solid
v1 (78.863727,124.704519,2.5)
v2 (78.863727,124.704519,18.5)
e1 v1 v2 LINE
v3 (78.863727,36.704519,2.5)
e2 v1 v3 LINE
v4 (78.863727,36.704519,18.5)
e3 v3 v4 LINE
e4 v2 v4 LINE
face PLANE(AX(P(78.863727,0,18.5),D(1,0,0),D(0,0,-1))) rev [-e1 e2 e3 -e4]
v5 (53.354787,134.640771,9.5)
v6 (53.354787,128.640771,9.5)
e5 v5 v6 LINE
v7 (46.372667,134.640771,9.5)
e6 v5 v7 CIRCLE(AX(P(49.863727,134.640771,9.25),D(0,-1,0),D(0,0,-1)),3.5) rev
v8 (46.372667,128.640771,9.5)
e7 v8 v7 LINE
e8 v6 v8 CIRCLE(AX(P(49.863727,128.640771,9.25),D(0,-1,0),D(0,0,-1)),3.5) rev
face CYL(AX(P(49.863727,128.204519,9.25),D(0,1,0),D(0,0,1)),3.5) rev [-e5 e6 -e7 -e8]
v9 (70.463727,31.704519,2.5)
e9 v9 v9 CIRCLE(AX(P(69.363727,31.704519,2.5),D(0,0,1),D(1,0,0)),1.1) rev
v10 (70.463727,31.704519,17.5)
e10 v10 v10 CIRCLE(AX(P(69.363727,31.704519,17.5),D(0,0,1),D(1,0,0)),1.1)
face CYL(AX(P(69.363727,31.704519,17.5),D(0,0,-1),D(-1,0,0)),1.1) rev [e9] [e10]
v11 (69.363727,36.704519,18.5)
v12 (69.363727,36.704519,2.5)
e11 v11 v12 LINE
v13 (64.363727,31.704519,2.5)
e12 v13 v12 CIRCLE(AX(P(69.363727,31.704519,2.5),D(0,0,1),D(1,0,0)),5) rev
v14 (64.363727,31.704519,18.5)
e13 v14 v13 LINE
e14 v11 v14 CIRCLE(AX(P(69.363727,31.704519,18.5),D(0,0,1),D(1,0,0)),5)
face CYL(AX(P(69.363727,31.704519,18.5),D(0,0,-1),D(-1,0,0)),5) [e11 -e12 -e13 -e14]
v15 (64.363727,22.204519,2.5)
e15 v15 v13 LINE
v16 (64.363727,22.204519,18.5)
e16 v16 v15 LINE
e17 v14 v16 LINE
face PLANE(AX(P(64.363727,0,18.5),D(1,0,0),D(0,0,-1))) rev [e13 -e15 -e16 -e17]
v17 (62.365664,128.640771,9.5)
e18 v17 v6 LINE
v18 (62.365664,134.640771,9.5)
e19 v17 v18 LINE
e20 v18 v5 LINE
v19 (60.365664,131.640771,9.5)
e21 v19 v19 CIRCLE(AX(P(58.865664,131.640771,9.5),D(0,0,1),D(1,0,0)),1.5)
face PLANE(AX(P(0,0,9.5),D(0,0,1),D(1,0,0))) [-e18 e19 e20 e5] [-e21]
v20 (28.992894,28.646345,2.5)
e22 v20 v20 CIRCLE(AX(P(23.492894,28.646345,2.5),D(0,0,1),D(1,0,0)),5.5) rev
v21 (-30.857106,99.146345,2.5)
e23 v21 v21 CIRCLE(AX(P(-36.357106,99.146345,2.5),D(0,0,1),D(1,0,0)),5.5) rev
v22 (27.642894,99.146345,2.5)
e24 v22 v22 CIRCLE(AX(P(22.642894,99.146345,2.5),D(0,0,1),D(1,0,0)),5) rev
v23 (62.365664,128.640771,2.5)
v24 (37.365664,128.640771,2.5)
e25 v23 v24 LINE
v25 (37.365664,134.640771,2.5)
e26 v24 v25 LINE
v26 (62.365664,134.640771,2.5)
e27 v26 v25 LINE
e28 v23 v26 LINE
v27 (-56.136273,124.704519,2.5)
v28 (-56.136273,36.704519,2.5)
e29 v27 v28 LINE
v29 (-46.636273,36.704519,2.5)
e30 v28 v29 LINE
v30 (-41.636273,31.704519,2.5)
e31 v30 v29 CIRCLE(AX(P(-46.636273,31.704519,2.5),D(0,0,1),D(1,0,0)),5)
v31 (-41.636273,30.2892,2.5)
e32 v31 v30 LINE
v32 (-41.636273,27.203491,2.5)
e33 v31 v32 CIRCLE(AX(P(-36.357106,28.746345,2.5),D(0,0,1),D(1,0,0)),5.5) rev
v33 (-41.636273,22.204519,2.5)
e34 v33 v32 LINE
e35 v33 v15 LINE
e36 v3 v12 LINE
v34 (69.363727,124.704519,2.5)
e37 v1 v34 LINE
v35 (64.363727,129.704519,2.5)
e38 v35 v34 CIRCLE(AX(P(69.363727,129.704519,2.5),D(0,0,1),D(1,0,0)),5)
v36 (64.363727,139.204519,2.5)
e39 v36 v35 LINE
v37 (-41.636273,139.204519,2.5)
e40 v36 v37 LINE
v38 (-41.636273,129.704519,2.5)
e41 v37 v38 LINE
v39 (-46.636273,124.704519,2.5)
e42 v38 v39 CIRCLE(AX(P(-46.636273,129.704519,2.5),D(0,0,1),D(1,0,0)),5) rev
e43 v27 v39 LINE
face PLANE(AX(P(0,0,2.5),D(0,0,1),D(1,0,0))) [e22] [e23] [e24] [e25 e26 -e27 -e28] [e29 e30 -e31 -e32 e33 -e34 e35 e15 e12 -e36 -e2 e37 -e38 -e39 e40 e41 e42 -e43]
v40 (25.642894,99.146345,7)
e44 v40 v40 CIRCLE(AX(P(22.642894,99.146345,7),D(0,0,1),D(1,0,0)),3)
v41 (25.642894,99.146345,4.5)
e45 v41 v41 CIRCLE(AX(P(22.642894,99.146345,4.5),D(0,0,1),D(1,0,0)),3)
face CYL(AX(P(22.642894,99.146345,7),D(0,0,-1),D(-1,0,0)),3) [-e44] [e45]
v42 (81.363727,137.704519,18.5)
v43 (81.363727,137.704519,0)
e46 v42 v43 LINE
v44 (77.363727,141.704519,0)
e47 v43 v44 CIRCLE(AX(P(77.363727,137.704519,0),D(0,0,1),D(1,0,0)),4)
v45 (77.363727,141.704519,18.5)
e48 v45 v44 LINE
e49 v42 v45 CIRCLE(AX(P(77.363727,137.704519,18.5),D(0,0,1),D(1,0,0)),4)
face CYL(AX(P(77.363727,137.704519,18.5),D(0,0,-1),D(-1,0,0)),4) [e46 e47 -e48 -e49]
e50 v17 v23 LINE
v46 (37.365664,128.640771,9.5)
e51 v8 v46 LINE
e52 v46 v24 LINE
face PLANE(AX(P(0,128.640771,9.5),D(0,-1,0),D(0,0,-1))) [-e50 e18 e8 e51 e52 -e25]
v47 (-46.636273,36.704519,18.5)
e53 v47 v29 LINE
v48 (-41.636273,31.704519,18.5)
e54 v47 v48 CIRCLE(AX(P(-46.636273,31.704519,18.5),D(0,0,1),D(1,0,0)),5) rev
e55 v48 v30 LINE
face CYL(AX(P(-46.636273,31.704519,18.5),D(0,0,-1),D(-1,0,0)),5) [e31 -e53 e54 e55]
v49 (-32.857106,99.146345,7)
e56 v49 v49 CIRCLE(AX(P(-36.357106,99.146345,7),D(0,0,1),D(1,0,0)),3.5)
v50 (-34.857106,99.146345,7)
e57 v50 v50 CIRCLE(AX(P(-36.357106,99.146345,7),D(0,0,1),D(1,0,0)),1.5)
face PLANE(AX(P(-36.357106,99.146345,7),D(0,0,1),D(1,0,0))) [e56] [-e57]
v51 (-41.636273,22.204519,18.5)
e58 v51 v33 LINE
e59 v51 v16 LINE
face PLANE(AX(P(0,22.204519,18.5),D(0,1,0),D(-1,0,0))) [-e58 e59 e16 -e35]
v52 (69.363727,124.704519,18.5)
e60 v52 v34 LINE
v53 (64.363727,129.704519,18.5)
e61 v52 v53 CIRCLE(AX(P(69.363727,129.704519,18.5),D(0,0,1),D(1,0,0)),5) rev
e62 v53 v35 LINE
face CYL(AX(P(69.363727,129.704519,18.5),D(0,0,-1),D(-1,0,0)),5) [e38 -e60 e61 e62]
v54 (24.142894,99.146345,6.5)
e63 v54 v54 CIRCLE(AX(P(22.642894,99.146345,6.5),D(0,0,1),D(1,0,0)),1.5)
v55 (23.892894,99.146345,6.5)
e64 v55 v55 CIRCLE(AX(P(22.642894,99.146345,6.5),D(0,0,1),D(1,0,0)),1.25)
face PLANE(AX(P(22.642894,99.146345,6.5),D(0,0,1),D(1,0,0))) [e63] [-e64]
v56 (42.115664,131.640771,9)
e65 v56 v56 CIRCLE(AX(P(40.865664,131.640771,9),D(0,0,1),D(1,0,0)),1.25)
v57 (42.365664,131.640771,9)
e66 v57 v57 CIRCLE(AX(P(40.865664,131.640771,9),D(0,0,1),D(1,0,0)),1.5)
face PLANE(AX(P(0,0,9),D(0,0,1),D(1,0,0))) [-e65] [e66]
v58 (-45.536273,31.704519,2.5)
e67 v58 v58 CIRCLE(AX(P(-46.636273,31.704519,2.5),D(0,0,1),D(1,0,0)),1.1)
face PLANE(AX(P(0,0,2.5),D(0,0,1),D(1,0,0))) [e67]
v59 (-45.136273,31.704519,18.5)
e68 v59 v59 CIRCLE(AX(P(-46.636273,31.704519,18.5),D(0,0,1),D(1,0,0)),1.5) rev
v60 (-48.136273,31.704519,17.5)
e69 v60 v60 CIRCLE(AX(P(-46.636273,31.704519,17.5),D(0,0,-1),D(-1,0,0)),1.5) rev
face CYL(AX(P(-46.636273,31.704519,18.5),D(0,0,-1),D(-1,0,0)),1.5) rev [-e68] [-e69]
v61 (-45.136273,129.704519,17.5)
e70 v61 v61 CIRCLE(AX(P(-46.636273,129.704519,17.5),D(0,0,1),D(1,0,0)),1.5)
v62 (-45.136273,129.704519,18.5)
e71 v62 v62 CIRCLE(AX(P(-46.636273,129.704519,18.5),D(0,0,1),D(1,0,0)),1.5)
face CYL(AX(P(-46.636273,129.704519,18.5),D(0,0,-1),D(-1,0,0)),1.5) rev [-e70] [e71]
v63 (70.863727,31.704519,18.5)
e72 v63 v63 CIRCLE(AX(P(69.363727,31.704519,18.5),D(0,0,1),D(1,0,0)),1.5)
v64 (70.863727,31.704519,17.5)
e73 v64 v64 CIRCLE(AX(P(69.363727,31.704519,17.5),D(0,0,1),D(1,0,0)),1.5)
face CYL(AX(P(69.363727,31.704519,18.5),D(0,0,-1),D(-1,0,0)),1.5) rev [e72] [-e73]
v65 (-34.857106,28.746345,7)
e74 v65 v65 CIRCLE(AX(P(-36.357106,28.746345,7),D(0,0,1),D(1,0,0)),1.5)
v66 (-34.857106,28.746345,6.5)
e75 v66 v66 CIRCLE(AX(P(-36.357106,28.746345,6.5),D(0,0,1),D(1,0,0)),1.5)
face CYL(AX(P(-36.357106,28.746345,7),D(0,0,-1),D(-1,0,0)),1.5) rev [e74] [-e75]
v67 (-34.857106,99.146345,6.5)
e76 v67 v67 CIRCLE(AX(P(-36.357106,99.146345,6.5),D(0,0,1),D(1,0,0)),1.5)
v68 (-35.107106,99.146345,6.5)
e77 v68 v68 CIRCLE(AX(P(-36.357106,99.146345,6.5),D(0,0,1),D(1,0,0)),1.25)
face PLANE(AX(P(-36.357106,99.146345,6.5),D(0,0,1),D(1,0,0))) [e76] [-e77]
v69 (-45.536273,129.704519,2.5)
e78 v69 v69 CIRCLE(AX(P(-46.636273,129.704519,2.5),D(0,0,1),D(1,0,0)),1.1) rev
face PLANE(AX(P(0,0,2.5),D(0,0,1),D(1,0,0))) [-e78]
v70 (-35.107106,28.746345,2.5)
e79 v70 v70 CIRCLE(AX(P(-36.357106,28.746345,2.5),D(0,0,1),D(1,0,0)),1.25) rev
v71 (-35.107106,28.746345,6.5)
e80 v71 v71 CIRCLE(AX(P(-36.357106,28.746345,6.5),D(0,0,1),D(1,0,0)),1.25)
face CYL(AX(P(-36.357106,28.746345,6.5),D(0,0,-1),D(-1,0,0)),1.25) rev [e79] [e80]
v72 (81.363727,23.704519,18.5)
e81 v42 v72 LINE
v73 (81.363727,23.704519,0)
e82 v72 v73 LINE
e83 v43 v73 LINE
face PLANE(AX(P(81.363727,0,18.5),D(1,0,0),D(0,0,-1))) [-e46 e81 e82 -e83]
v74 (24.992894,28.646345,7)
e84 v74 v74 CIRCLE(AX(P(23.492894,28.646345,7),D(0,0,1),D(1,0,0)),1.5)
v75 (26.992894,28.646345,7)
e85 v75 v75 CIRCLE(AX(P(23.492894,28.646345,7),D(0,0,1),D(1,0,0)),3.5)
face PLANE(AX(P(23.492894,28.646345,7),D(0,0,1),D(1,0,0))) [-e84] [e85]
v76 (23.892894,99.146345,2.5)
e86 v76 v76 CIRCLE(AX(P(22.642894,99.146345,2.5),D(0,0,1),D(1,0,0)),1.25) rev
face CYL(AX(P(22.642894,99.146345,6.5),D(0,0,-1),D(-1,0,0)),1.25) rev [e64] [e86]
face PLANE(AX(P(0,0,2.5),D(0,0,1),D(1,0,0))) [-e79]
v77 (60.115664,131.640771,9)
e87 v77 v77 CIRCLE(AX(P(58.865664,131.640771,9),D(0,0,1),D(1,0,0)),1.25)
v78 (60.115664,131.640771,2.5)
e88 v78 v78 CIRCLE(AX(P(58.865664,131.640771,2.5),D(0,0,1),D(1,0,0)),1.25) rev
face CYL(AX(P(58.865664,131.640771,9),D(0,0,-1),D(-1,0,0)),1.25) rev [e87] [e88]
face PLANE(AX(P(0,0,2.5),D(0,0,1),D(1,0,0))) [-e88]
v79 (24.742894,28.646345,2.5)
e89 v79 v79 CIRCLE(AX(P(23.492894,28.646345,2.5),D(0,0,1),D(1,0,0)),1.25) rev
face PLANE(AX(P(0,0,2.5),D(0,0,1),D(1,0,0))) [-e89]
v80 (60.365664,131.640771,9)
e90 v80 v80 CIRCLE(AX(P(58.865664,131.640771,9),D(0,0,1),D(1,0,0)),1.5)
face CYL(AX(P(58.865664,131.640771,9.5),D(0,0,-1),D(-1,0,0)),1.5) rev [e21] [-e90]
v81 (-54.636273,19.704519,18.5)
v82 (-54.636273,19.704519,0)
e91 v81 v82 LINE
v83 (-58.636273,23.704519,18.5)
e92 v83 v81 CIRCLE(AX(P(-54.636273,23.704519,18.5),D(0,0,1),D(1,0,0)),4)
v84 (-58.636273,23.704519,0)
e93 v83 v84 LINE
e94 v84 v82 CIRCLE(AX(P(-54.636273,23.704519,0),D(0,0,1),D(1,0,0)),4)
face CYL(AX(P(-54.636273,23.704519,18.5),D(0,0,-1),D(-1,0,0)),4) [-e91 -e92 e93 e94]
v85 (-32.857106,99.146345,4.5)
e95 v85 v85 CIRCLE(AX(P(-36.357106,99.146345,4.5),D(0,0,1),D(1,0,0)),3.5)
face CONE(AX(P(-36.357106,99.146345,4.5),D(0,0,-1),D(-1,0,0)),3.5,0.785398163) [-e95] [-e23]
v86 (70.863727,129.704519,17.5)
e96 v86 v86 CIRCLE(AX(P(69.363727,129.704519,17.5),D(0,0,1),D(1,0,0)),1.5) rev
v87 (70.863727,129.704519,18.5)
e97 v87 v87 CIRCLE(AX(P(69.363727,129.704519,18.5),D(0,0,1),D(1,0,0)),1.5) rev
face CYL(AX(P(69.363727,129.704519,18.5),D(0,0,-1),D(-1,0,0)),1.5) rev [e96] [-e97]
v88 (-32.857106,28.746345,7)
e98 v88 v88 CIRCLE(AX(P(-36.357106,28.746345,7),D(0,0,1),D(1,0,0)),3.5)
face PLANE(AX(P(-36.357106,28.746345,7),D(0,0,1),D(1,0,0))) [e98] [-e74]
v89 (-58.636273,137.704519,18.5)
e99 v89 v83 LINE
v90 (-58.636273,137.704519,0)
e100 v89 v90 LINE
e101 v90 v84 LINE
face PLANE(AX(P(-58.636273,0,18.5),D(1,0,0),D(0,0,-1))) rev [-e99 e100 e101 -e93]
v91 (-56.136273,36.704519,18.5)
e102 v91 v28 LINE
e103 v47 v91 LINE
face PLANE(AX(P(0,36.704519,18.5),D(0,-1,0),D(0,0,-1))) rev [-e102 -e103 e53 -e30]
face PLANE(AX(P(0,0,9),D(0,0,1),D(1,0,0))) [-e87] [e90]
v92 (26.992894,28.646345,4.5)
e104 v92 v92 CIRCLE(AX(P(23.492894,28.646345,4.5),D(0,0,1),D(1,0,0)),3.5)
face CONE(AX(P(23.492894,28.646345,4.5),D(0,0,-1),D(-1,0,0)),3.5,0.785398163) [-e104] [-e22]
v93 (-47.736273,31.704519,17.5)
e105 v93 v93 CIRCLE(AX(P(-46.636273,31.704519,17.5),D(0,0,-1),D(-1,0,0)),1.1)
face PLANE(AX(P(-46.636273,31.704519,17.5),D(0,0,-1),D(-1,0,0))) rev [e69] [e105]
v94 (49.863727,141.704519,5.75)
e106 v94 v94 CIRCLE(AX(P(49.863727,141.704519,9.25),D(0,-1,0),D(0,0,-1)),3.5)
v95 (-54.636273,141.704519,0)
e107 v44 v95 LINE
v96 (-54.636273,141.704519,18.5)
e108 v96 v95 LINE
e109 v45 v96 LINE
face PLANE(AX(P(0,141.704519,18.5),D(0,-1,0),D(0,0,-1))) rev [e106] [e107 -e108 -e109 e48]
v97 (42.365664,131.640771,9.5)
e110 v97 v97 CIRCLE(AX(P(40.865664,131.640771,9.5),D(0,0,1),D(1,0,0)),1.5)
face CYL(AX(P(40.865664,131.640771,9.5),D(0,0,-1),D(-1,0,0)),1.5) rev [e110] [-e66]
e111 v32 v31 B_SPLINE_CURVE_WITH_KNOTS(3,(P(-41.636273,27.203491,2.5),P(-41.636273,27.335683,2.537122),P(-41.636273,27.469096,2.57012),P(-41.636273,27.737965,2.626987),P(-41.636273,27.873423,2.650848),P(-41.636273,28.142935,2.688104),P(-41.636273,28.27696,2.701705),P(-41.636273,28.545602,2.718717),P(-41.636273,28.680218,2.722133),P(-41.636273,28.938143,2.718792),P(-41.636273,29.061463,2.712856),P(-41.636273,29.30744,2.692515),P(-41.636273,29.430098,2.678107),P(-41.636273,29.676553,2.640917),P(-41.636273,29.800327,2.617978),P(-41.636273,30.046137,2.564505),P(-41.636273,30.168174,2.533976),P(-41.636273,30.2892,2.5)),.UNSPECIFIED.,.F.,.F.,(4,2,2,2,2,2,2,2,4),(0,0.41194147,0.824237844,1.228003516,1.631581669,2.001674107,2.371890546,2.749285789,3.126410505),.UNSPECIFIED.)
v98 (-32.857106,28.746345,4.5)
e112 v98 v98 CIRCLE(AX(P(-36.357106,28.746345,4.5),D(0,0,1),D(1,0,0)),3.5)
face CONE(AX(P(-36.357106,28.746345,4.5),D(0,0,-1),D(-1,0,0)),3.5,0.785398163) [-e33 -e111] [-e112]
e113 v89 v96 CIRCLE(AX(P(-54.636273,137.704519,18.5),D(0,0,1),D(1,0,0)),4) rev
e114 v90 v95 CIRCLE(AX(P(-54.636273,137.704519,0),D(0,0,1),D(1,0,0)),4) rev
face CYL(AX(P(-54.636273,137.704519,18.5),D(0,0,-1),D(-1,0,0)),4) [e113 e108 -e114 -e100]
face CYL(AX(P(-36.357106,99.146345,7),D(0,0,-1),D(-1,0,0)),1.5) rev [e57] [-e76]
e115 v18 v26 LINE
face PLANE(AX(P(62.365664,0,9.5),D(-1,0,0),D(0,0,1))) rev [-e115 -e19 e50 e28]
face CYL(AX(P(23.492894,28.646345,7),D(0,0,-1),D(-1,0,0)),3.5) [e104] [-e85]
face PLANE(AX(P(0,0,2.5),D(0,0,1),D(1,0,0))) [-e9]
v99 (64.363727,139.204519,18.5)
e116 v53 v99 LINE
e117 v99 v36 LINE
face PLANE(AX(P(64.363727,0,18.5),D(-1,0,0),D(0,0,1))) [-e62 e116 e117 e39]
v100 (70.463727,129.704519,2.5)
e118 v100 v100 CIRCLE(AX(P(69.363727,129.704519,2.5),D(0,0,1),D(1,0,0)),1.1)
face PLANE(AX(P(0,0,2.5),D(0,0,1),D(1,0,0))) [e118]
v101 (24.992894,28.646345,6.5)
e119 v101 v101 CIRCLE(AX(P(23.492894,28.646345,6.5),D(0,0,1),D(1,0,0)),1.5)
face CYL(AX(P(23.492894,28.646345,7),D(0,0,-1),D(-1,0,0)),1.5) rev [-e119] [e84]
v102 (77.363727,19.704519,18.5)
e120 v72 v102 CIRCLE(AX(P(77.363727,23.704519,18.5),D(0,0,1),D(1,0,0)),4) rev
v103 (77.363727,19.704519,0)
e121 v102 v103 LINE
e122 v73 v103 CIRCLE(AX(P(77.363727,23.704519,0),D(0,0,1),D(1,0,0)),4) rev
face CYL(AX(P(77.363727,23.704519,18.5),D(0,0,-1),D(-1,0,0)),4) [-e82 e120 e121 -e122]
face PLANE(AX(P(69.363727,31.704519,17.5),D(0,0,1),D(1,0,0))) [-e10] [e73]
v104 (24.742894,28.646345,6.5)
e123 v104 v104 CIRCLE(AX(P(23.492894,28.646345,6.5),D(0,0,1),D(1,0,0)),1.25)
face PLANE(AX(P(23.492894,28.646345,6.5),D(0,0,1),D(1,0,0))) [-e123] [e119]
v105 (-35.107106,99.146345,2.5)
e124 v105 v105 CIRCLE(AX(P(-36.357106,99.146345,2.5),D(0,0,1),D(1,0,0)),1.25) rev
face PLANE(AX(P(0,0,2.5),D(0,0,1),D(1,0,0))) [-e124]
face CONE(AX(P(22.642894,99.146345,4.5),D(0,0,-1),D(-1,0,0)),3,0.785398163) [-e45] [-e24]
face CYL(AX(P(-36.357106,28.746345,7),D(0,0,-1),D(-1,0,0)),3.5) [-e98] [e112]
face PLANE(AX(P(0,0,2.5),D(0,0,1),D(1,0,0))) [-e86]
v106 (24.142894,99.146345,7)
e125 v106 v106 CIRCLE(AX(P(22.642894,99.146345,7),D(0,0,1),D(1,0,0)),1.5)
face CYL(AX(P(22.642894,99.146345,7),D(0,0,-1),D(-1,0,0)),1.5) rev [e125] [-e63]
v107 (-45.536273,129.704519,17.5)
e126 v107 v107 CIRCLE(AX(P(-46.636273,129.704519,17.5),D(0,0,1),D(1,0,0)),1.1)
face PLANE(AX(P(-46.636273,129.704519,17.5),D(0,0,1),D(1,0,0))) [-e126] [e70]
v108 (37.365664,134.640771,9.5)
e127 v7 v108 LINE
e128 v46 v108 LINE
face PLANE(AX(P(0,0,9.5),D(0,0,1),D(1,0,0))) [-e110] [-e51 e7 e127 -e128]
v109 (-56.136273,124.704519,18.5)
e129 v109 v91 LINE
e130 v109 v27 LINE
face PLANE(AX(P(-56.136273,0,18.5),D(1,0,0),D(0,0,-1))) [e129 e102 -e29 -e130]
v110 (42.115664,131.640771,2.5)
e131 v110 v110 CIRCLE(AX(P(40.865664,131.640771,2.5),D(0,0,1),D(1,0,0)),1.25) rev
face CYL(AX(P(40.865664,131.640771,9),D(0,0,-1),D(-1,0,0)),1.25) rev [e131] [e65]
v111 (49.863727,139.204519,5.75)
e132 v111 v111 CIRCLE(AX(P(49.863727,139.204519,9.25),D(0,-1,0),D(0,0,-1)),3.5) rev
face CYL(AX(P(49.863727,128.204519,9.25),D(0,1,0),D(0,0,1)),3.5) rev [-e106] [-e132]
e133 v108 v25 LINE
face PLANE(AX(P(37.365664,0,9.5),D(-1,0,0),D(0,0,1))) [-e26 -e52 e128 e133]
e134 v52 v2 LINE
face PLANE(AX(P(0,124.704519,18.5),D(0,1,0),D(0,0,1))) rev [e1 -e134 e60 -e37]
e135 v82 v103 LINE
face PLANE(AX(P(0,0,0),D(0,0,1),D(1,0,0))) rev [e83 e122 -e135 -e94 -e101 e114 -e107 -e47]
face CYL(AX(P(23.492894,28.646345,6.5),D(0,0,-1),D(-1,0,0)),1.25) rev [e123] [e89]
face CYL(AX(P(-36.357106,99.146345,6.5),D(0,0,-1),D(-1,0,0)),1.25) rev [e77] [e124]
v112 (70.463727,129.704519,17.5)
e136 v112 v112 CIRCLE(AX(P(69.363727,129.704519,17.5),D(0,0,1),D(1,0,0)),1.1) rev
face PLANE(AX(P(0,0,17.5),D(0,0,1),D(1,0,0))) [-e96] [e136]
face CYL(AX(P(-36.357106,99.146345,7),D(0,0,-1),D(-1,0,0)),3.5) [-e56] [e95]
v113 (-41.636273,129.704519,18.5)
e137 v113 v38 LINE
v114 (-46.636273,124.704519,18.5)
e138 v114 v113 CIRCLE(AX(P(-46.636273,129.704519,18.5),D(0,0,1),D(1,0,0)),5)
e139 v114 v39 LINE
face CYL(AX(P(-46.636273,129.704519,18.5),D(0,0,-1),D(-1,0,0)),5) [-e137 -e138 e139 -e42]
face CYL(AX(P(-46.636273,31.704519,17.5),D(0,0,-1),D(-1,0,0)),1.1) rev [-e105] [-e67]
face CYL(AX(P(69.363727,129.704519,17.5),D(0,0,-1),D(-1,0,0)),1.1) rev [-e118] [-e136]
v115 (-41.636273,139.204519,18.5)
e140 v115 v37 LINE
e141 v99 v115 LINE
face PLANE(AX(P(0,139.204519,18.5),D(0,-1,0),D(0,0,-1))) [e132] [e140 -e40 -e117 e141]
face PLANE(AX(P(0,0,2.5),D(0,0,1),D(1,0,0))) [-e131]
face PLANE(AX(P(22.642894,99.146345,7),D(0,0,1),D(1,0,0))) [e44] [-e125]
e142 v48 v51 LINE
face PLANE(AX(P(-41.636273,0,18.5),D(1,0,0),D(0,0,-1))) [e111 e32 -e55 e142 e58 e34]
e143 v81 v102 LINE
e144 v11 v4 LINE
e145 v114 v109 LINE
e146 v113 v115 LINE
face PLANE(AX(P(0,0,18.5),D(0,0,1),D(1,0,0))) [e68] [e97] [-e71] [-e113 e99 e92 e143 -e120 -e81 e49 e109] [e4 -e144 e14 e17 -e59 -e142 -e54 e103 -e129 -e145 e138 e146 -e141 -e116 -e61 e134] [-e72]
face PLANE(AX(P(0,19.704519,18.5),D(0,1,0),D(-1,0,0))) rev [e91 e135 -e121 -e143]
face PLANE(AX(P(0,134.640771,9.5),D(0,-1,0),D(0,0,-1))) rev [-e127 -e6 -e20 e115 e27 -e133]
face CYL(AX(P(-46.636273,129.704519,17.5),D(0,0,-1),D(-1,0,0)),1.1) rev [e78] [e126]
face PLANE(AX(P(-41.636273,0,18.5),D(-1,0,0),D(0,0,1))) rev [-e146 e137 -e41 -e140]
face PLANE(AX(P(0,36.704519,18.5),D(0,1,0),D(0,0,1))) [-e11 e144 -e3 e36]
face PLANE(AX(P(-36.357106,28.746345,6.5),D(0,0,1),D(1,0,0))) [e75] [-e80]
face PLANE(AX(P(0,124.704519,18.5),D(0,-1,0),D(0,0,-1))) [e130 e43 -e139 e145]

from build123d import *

# Parameters (mm, degrees)
CROQUIS1_W               = 25
CROQUIS1_H               = 6
CROQUIS1_R               = 3.5
CROQUIS1_R_2             = 3
CROQUIS1_R_3             = 1.5
CROQUIS1_R_4             = 1.25
CROQUIS1_R_5             = 1.1
SALIENTE_EXTRUIR5_DEPTH  = 18.5
VACIADO3_T               = -2.5
CROQUIS1_10_R            = 1.5
SALIENTE_EXTRUIR6_DEPTH  = 18.5
SALIENTE_EXTRUIR7_START  = 2.5
CROQUIS1_11_R            = 3.5
CROQUIS1_11_R_2          = 1.5
CROQUIS1_11_R_3          = 3
SALIENTE_EXTRUIR7_DEPTH  = 4.5
CHAFL_N1_SIZE            = 2
SALIENTE_EXTRUIR8_START  = 2.5
CROQUIS1_12_W            = 25
CROQUIS1_12_H            = 6
CROQUIS1_12_R            = 1.5
SALIENTE_EXTRUIR8_DEPTH  = 7
CROQUIS1_13_R            = 1.5
CROQUIS1_13_R_2          = 1.1
SALIENTE_EXTRUIR9_DEPTH  = 17.5
SALIENTE_EXTRUIR10_START = 2.5
CROQUIS1_14_R            = 1.5
CROQUIS1_14_R_2          = 1.25
SALIENTE_EXTRUIR10_DEPTH = 4
CORTAR_EXTRUIR2_START    = 141.704519
CORTAR_EXTRUIR2_DEPTH    = 13.5
CROQUIS1_17_R            = 1.5
CROQUIS1_17_R_2          = 1.25
SALIENTE_EXTRUIR12_DEPTH = 9


with BuildPart() as part:
    # Croquis1 → Saliente-Extruir5 (new body)
    # profile 1 of 32: a face of its own
    with BuildSketch(Plane.XY):
        with BuildLine():
            Line((-41.636272976, 141.704519051), (-41.636272976, 129.704519051))
            ThreePointArc((-41.636272976, 129.704519051), (-43.10073907, 126.168985145), (-46.636272976, 124.704519051))
            Line((-46.636272976, 124.704519051), (-58.636272976, 124.704519051))
            Line((-58.636272976, 124.704519051), (-58.636272976, 36.704519051))
            Line((-58.636272976, 36.704519051), (-46.636272976, 36.704519051))
            ThreePointArc((-46.636272976, 36.704519051), (-43.10073907, 35.240052957), (-41.636272976, 31.704519051))
            Line((-41.636272976, 31.704519051), (-41.636272976, 19.704519051))
            Line((-41.636272976, 19.704519051), (64.363727024, 19.704519051))
            Line((64.363727024, 19.704519051), (64.363727024, 31.704519051))
            ThreePointArc((64.363727024, 31.704519051), (65.828193118, 35.240052957), (69.363727024, 36.704519051))
            Line((69.363727024, 36.704519051), (81.363727024, 36.704519051))
            Line((81.363727024, 36.704519051), (81.363727024, 124.704519051))
            Line((81.363727024, 124.704519051), (69.363727024, 124.704519051))
            ThreePointArc((69.363727024, 124.704519051), (65.828193118, 126.168985145), (64.363727024, 129.704519051))
            Line((64.363727024, 129.704519051), (64.363727024, 141.704519051))
            Line((64.363727024, 141.704519051), (-41.636272976, 141.704519051))
        make_face()
        with BuildLine():
            Line((-40.35710629, 99.239677302), (-40.35710629, 102.746345322))
            Line((-40.35710629, 102.746345322), (-34.597202474, 102.746345322))
            Line((-34.597202474, 102.746345322), (21.034030845, 102.746345322))
            Line((21.034030845, 102.746345322), (26.64289371, 102.746345322))
            Line((26.64289371, 102.746345322), (26.64289371, 99.465838351))
            Line((26.64289371, 99.465838351), (26.64289371, 30.171959952))
            ThreePointArc((26.64289371, 30.171959952), (26.904271731, 29.428969114), (26.99289371, 28.646345322))
            ThreePointArc((26.99289371, 28.646345322), (26.904271731, 27.86372153), (26.64289371, 27.120730691))
            Line((26.64289371, 27.120730691), (26.64289371, 24.746345322))
            Line((26.64289371, 24.746345322), (20.74289371, 24.746345322))
            Line((20.74289371, 24.746345322), (-34.434462508, 24.746345322))
            Line((-34.434462508, 24.746345322), (-40.35710629, 24.746345322))
            Line((-40.35710629, 24.746345322), (-40.35710629, 28.581516019))
            Line((-40.35710629, 28.581516019), (-40.35710629, 99.239677302))
        make_face(mode=Mode.SUBTRACT)
        with Locations((49.86566447, 131.64077129)):
            Rectangle(CROQUIS1_W, CROQUIS1_H, mode=Mode.SUBTRACT)
    # profile 2 of 32: a face of its own
    with BuildSketch(Plane.XY):
        with BuildLine():
            Line((-34.597202474, 102.746345322), (-40.35710629, 102.746345322))
            Line((-40.35710629, 102.746345322), (-40.35710629, 99.239677302))
            Line((-40.35710629, 99.239677302), (-40.35710629, 28.581516019))
            Line((-40.35710629, 28.581516019), (-40.35710629, 24.746345322))
            Line((-40.35710629, 24.746345322), (-34.434462508, 24.746345322))
            Line((-34.434462508, 24.746345322), (20.74289371, 24.746345322))
            Line((20.74289371, 24.746345322), (26.64289371, 24.746345322))
            Line((26.64289371, 24.746345322), (26.64289371, 27.120730691))
            ThreePointArc((26.64289371, 27.120730691), (19.99289371, 28.646345322), (26.64289371, 30.171959952))
            Line((26.64289371, 30.171959952), (26.64289371, 99.465838351))
            Line((26.64289371, 99.465838351), (26.64289371, 102.746345322))
            Line((26.64289371, 102.746345322), (21.034030845, 102.746345322))
            Line((21.034030845, 102.746345322), (-34.597202474, 102.746345322))
        make_face()
        with Locations((-36.35710629, 28.746345322)):
            Circle(CROQUIS1_R, mode=Mode.SUBTRACT)
        with Locations((-36.35710629, 99.146345322)):
            Circle(CROQUIS1_R, mode=Mode.SUBTRACT)
        with Locations((22.64289371, 99.146345322)):
            Circle(CROQUIS1_R_2, mode=Mode.SUBTRACT)
    # profile 3 of 32: a face of its own
    with BuildSketch(Plane.XY):
        with Locations((-36.35710629, 99.146345322)):
            Circle(CROQUIS1_R)
        with Locations((-36.35710629, 99.146345322)):
            Circle(CROQUIS1_R_3, mode=Mode.SUBTRACT)
    # profile 4 of 32: a face of its own
    with BuildSketch(Plane.XY):
        with Locations((-36.35710629, 99.146345322)):
            Circle(CROQUIS1_R_3)
        with Locations((-36.35710629, 99.146345322)):
            Circle(CROQUIS1_R_4, mode=Mode.SUBTRACT)
    # profile 5 of 32: a face of its own
    with BuildSketch(Plane.XY):
        with Locations((-36.35710629, 99.146345322)):
            Circle(CROQUIS1_R_4)
    # profile 6 of 32: a face of its own
    with BuildSketch(Plane.XY):
        with BuildLine():
            ThreePointArc((-46.636272976, 124.704519051), (-43.10073907, 126.168985145), (-41.636272976, 129.704519051))
            Line((-41.636272976, 129.704519051), (-41.636272976, 141.704519051))
            Line((-41.636272976, 141.704519051), (-54.636272976, 141.704519051))
            ThreePointArc((-54.636272976, 141.704519051), (-57.4647001, 140.532946176), (-58.636272976, 137.704519051))
            Line((-58.636272976, 137.704519051), (-58.636272976, 124.704519051))
            Line((-58.636272976, 124.704519051), (-46.636272976, 124.704519051))
        make_face()
        with Locations((-46.636272976, 129.704519051)):
            Circle(CROQUIS1_R_3, mode=Mode.SUBTRACT)
    # profile 7 of 32: a face of its own
    with BuildSketch(Plane.XY):
        with Locations((-46.636272976, 129.704519051)):
            Circle(CROQUIS1_R_3)
        with Locations((-46.636272976, 129.704519051)):
            Circle(CROQUIS1_R_5, mode=Mode.SUBTRACT)
    # profile 8 of 32: a face of its own
    with BuildSketch(Plane.XY):
        with Locations((-46.636272976, 129.704519051)):
            Circle(CROQUIS1_R_5)
    # profile 9 of 32: a face of its own
    with BuildSketch(Plane.XY):
        with BuildLine():
            Line((77.363727024, 141.704519051), (64.363727024, 141.704519051))
            Line((64.363727024, 141.704519051), (64.363727024, 129.704519051))
            ThreePointArc((64.363727024, 129.704519051), (65.828193118, 126.168985145), (69.363727024, 124.704519051))
            Line((69.363727024, 124.704519051), (81.363727024, 124.704519051))
            Line((81.363727024, 124.704519051), (81.363727024, 137.704519051))
            ThreePointArc((81.363727024, 137.704519051), (80.192154149, 140.532946176), (77.363727024, 141.704519051))
        make_face()
        with Locations((69.363727024, 129.704519051)):
            Circle(CROQUIS1_R_3, mode=Mode.SUBTRACT)
    # profile 10 of 32: a face of its own
    with BuildSketch(Plane.XY):
        with Locations((69.363727024, 129.704519051)):
            Circle(CROQUIS1_R_3)
        with Locations((69.363727024, 129.704519051)):
            Circle(CROQUIS1_R_5, mode=Mode.SUBTRACT)
    # profile 11 of 32: a face of its own
    with BuildSketch(Plane.XY):
        with Locations((69.363727024, 129.704519051)):
            Circle(CROQUIS1_R_5)
    # profile 12 of 32: a face of its own
    with BuildSketch(Plane.XY):
        with Locations((49.86566447, 131.64077129)):
            Rectangle(CROQUIS1_W, CROQUIS1_H)
        with Locations((58.86566447, 131.64077129)):
            Circle(CROQUIS1_R_3, mode=Mode.SUBTRACT)
        with Locations((40.86566447, 131.64077129)):
            Circle(CROQUIS1_R_3, mode=Mode.SUBTRACT)
    # profile 13 of 32: a face of its own
    with BuildSketch(Plane.XY):
        with Locations((58.86566447, 131.64077129)):
            Circle(CROQUIS1_R_3)
        with Locations((58.86566447, 131.64077129)):
            Circle(CROQUIS1_R_4, mode=Mode.SUBTRACT)
    # profile 14 of 32: a face of its own
    with BuildSketch(Plane.XY):
        with Locations((58.86566447, 131.64077129)):
            Circle(CROQUIS1_R_4)
    # profile 15 of 32: a face of its own
    with BuildSketch(Plane.XY):
        with Locations((40.86566447, 131.64077129)):
            Circle(CROQUIS1_R_3)
        with Locations((40.86566447, 131.64077129)):
            Circle(CROQUIS1_R_4, mode=Mode.SUBTRACT)
    # profile 16 of 32: a face of its own
    with BuildSketch(Plane.XY):
        with Locations((40.86566447, 131.64077129)):
            Circle(CROQUIS1_R_4)
    # profile 17 of 32: a face of its own
    with BuildSketch(Plane.XY):
        with Locations((22.64289371, 99.146345322)):
            Circle(CROQUIS1_R_2)
        with Locations((22.64289371, 99.146345322)):
            Circle(CROQUIS1_R_3, mode=Mode.SUBTRACT)
    # profile 18 of 32: a face of its own
    with BuildSketch(Plane.XY):
        with Locations((22.64289371, 99.146345322)):
            Circle(CROQUIS1_R_3)
        with Locations((22.64289371, 99.146345322)):
            Circle(CROQUIS1_R_4, mode=Mode.SUBTRACT)
    # profile 19 of 32: a face of its own
    with BuildSketch(Plane.XY):
        with Locations((22.64289371, 99.146345322)):
            Circle(CROQUIS1_R_4)
    # profile 20 of 32: a face of its own
    with BuildSketch(Plane.XY):
        with BuildLine():
            Line((-46.636272976, 36.704519051), (-58.636272976, 36.704519051))
            Line((-58.636272976, 36.704519051), (-58.636272976, 23.704519051))
            ThreePointArc((-58.636272976, 23.704519051), (-57.4647001, 20.876091926), (-54.636272976, 19.704519051))
            Line((-54.636272976, 19.704519051), (-41.636272976, 19.704519051))
            Line((-41.636272976, 19.704519051), (-41.636272976, 31.704519051))
            ThreePointArc((-41.636272976, 31.704519051), (-43.10073907, 35.240052957), (-46.636272976, 36.704519051))
        make_face()
        with Locations((-46.636272976, 31.704519051)):
            Circle(CROQUIS1_R_3, mode=Mode.SUBTRACT)
    # profile 21 of 32: a face of its own
    with BuildSketch(Plane.XY):
        with Locations((-46.636272976, 31.704519051)):
            Circle(CROQUIS1_R_3)
        with Locations((-46.636272976, 31.704519051)):
            Circle(CROQUIS1_R_5, mode=Mode.SUBTRACT)
    # profile 22 of 32: a face of its own
    with BuildSketch(Plane.XY):
        with Locations((-46.636272976, 31.704519051)):
            Circle(CROQUIS1_R_5)
    # profile 23 of 32: a face of its own
    with BuildSketch(Plane.XY):
        with Locations((-36.35710629, 28.746345322)):
            Circle(CROQUIS1_R)
        with Locations((-36.35710629, 28.746345322)):
            Circle(CROQUIS1_R_3, mode=Mode.SUBTRACT)
    # profile 24 of 32: a face of its own
    with BuildSketch(Plane.XY):
        with Locations((-36.35710629, 28.746345322)):
            Circle(CROQUIS1_R_3)
        with Locations((-36.35710629, 28.746345322)):
            Circle(CROQUIS1_R_4, mode=Mode.SUBTRACT)
    # profile 25 of 32: a face of its own
    with BuildSketch(Plane.XY):
        with Locations((-36.35710629, 28.746345322)):
            Circle(CROQUIS1_R_4)
    # profile 26 of 32: a face of its own
    with BuildSketch(Plane.XY):
        with BuildLine():
            Line((26.64289371, 27.946345322), (26.64289371, 30.171959952))
            ThreePointArc((26.64289371, 30.171959952), (19.99289371, 28.646345322), (26.64289371, 27.120730691))
            Line((26.64289371, 27.120730691), (26.64289371, 27.946345322))
        make_face()
        with Locations((23.49289371, 28.646345322)):
            Circle(CROQUIS1_R_3, mode=Mode.SUBTRACT)
    # profile 27 of 32: a face of its own
    with BuildSketch(Plane.XY):
        with BuildLine():
            ThreePointArc((26.99289371, 28.646345322), (26.904271731, 29.428969114), (26.64289371, 30.171959952))
            Line((26.64289371, 30.171959952), (26.64289371, 27.946345322))
            Line((26.64289371, 27.946345322), (26.64289371, 27.120730691))
            ThreePointArc((26.64289371, 27.120730691), (26.904271731, 27.86372153), (26.99289371, 28.646345322))
        make_face()
    # profile 28 of 32: a face of its own
    with BuildSketch(Plane.XY):
        with Locations((23.49289371, 28.646345322)):
            Circle(CROQUIS1_R_3)
        with Locations((23.49289371, 28.646345322)):
            Circle(CROQUIS1_R_4, mode=Mode.SUBTRACT)
    # profile 29 of 32: a face of its own
    with BuildSketch(Plane.XY):
        with Locations((23.49289371, 28.646345322)):
            Circle(CROQUIS1_R_4)
    # profile 30 of 32: a face of its own
    with BuildSketch(Plane.XY):
        with BuildLine():
            Line((81.363727024, 23.704519051), (81.363727024, 36.704519051))
            Line((81.363727024, 36.704519051), (69.363727024, 36.704519051))
            ThreePointArc((69.363727024, 36.704519051), (65.828193118, 35.240052957), (64.363727024, 31.704519051))
            Line((64.363727024, 31.704519051), (64.363727024, 19.704519051))
            Line((64.363727024, 19.704519051), (77.363727024, 19.704519051))
            ThreePointArc((77.363727024, 19.704519051), (80.192154149, 20.876091926), (81.363727024, 23.704519051))
        make_face()
        with Locations((69.363727024, 31.704519051)):
            Circle(CROQUIS1_R_3, mode=Mode.SUBTRACT)
    # profile 31 of 32: a face of its own
    with BuildSketch(Plane.XY):
        with Locations((69.363727024, 31.704519051)):
            Circle(CROQUIS1_R_3)
        with Locations((69.363727024, 31.704519051)):
            Circle(CROQUIS1_R_5, mode=Mode.SUBTRACT)
    # profile 32 of 32: a face of its own
    with BuildSketch(Plane.XY):
        with Locations((69.363727024, 31.704519051)):
            Circle(CROQUIS1_R_5)
    extrude(amount=SALIENTE_EXTRUIR5_DEPTH)

    # Vaciado3
    vaciado3_openings = [part.faces().sort_by_distance(p)[0] for p in [
        (11.363727024, 80.704519051, 18.5),
    ]]
    offset(amount=VACIADO3_T, openings=vaciado3_openings, kind=Kind.INTERSECTION)

    # Croquis1<10> → Saliente-Extruir6 (add)
    # profile 1 of 4: a face of its own
    with BuildSketch(Plane.XY):
        with BuildLine():
            ThreePointArc((-46.636272976, 124.704519051), (-43.10073907, 126.168985145), (-41.636272976, 129.704519051))
            Line((-41.636272976, 129.704519051), (-41.636272976, 141.704519051))
            Line((-41.636272976, 141.704519051), (-54.636272976, 141.704519051))
            ThreePointArc((-54.636272976, 141.704519051), (-57.4647001, 140.532946176), (-58.636272976, 137.704519051))
            Line((-58.636272976, 137.704519051), (-58.636272976, 124.704519051))
            Line((-58.636272976, 124.704519051), (-46.636272976, 124.704519051))
        make_face()
        with Locations((-46.636272976, 129.704519051)):
            Circle(CROQUIS1_10_R, mode=Mode.SUBTRACT)
    # profile 2 of 4: a face of its own
    with BuildSketch(Plane.XY):
        with BuildLine():
            Line((77.363727024, 141.704519051), (64.363727024, 141.704519051))
            Line((64.363727024, 141.704519051), (64.363727024, 129.704519051))
            ThreePointArc((64.363727024, 129.704519051), (65.828193118, 126.168985145), (69.363727024, 124.704519051))
            Line((69.363727024, 124.704519051), (81.363727024, 124.704519051))
            Line((81.363727024, 124.704519051), (81.363727024, 137.704519051))
            ThreePointArc((81.363727024, 137.704519051), (80.192154149, 140.532946176), (77.363727024, 141.704519051))
        make_face()
        with Locations((69.363727024, 129.704519051)):
            Circle(CROQUIS1_10_R, mode=Mode.SUBTRACT)
    # profile 3 of 4: a face of its own
    with BuildSketch(Plane.XY):
        with BuildLine():
            Line((81.363727024, 23.704519051), (81.363727024, 36.704519051))
            Line((81.363727024, 36.704519051), (69.363727024, 36.704519051))
            ThreePointArc((69.363727024, 36.704519051), (65.828193118, 35.240052957), (64.363727024, 31.704519051))
            Line((64.363727024, 31.704519051), (64.363727024, 19.704519051))
            Line((64.363727024, 19.704519051), (77.363727024, 19.704519051))
            ThreePointArc((77.363727024, 19.704519051), (80.192154149, 20.876091926), (81.363727024, 23.704519051))
        make_face()
        with Locations((69.363727024, 31.704519051)):
            Circle(CROQUIS1_10_R, mode=Mode.SUBTRACT)
    # profile 4 of 4: a face of its own
    with BuildSketch(Plane.XY):
        with BuildLine():
            Line((-46.636272976, 36.704519051), (-58.636272976, 36.704519051))
            Line((-58.636272976, 36.704519051), (-58.636272976, 23.704519051))
            ThreePointArc((-58.636272976, 23.704519051), (-57.4647001, 20.876091926), (-54.636272976, 19.704519051))
            Line((-54.636272976, 19.704519051), (-41.636272976, 19.704519051))
            Line((-41.636272976, 19.704519051), (-41.636272976, 31.704519051))
            ThreePointArc((-41.636272976, 31.704519051), (-43.10073907, 35.240052957), (-46.636272976, 36.704519051))
        make_face()
        with Locations((-46.636272976, 31.704519051)):
            Circle(CROQUIS1_10_R, mode=Mode.SUBTRACT)
    extrude(amount=SALIENTE_EXTRUIR6_DEPTH)

    # Croquis1<11> → Saliente-Extruir7 (add)
    # profile 1 of 5: a face of its own
    with BuildSketch(Plane.XY.offset(SALIENTE_EXTRUIR7_START)):
        with Locations((-36.35710629, 28.746345322)):
            Circle(CROQUIS1_11_R)
        with Locations((-36.35710629, 28.746345322)):
            Circle(CROQUIS1_11_R_2, mode=Mode.SUBTRACT)
    # profile 2 of 5: a face of its own
    with BuildSketch(Plane.XY.offset(SALIENTE_EXTRUIR7_START)):
        with BuildLine():
            Line((26.64289371, 27.946345322), (26.64289371, 30.171959952))
            ThreePointArc((26.64289371, 30.171959952), (19.99289371, 28.646345322), (26.64289371, 27.120730691))
            Line((26.64289371, 27.120730691), (26.64289371, 27.946345322))
        make_face()
        with Locations((23.49289371, 28.646345322)):
            Circle(CROQUIS1_11_R_2, mode=Mode.SUBTRACT)
    # profile 3 of 5: a face of its own
    with BuildSketch(Plane.XY.offset(SALIENTE_EXTRUIR7_START)):
        with Locations((22.64289371, 99.146345322)):
            Circle(CROQUIS1_11_R_3)
        with Locations((22.64289371, 99.146345322)):
            Circle(CROQUIS1_11_R_2, mode=Mode.SUBTRACT)
    # profile 4 of 5: a face of its own
    with BuildSketch(Plane.XY.offset(SALIENTE_EXTRUIR7_START)):
        with Locations((-36.35710629, 99.146345322)):
            Circle(CROQUIS1_11_R)
        with Locations((-36.35710629, 99.146345322)):
            Circle(CROQUIS1_11_R_2, mode=Mode.SUBTRACT)
    # profile 5 of 5: a face of its own
    with BuildSketch(Plane.XY.offset(SALIENTE_EXTRUIR7_START)):
        with BuildLine():
            ThreePointArc((26.99289371, 28.646345322), (26.904271731, 29.428969114), (26.64289371, 30.171959952))
            Line((26.64289371, 30.171959952), (26.64289371, 27.946345322))
            Line((26.64289371, 27.946345322), (26.64289371, 27.120730691))
            ThreePointArc((26.64289371, 27.120730691), (26.904271731, 27.86372153), (26.99289371, 28.646345322))
        make_face()
    extrude(amount=SALIENTE_EXTRUIR7_DEPTH)

    # Chaflán1
    # the kernel refuses this chamfer: 2 mm, written as the material it adds along each edge
    with BuildSketch(Plane(origin=(-36.35710629, 28.746345322, 2.5), x_dir=(1, 0, 0), z_dir=(0, -1, 0))) as chafl_n1_piece_1:
        Polygon((3.5 + CHAFL_N1_SIZE, 0), (3.5, CHAFL_N1_SIZE), (3.5, 0), align=None)
    revolve(axis=Axis((-36.35710629, 28.746345322, 2.5), (0, 0, 1)))
    with BuildSketch(Plane(origin=(22.64289371, 99.146345322, 2.5), x_dir=(1, 0, 0), z_dir=(0, -1, 0))) as chafl_n1_piece_2:
        Polygon((3 + CHAFL_N1_SIZE, 0), (3, CHAFL_N1_SIZE), (3, 0), align=None)
    revolve(axis=Axis((22.64289371, 99.146345322, 2.5), (0, 0, 1)))
    with BuildSketch(Plane(origin=(-36.35710629, 99.146345322, 2.5), x_dir=(1, 0, 0), z_dir=(0, -1, 0))) as chafl_n1_piece_3:
        Polygon((3.5 + CHAFL_N1_SIZE, 0), (3.5, CHAFL_N1_SIZE), (3.5, 0), align=None)
    revolve(axis=Axis((-36.35710629, 99.146345322, 2.5), (0, 0, 1)))
    with BuildSketch(Plane(origin=(23.49289371, 28.646345322, 2.5), x_dir=(0.8999999999999787, -0.43588989435411135, 0), z_dir=(0.43588989435411135, 0.8999999999999787, 0))) as chafl_n1_piece_4:
        Polygon((3.5 + CHAFL_N1_SIZE, 0), (3.5, -CHAFL_N1_SIZE), (3.5, 0), align=None)
    revolve(axis=Axis((23.49289371, 28.646345322, 2.5), (0, 0, -1)))

    # Croquis1<12> → Saliente-Extruir8 (add)
    with BuildSketch(Plane.XY.offset(SALIENTE_EXTRUIR8_START)):
        with Locations((49.86566447, 131.64077129)):
            Rectangle(CROQUIS1_12_W, CROQUIS1_12_H)
        with Locations((58.86566447, 131.64077129)):
            Circle(CROQUIS1_12_R, mode=Mode.SUBTRACT)
        with Locations((40.86566447, 131.64077129)):
            Circle(CROQUIS1_12_R, mode=Mode.SUBTRACT)
    extrude(amount=SALIENTE_EXTRUIR8_DEPTH)

    # Croquis1<13> → Saliente-Extruir9 (add)
    # profile 1 of 4: a face of its own
    with BuildSketch(Plane.XY):
        with Locations((-46.636272976, 129.704519051)):
            Circle(CROQUIS1_13_R)
        with Locations((-46.636272976, 129.704519051)):
            Circle(CROQUIS1_13_R_2, mode=Mode.SUBTRACT)
    # profile 2 of 4: a face of its own
    with BuildSketch(Plane.XY):
        with Locations((69.363727024, 129.704519051)):
            Circle(CROQUIS1_13_R)
        with Locations((69.363727024, 129.704519051)):
            Circle(CROQUIS1_13_R_2, mode=Mode.SUBTRACT)
    # profile 3 of 4: a face of its own
    with BuildSketch(Plane.XY):
        with Locations((69.363727024, 31.704519051)):
            Circle(CROQUIS1_13_R)
        with Locations((69.363727024, 31.704519051)):
            Circle(CROQUIS1_13_R_2, mode=Mode.SUBTRACT)
    # profile 4 of 4: a face of its own
    with BuildSketch(Plane.XY):
        with Locations(Location((-46.636272976, 31.704519051, 0), (0, 0, 180))):
            Circle(CROQUIS1_13_R)
        with Locations(Location((-46.636272976, 31.704519051, 0), (0, 0, 180))):
            Circle(CROQUIS1_13_R_2, mode=Mode.SUBTRACT)
    extrude(amount=SALIENTE_EXTRUIR9_DEPTH)

    # Croquis1<14> → Saliente-Extruir10 (add)
    # profile 1 of 4: a face of its own
    with BuildSketch(Plane.XY.offset(SALIENTE_EXTRUIR10_START)):
        with Locations((-36.35710629, 28.746345322)):
            Circle(CROQUIS1_14_R)
        with Locations((-36.35710629, 28.746345322)):
            Circle(CROQUIS1_14_R_2, mode=Mode.SUBTRACT)
    # profile 2 of 4: a face of its own
    with BuildSketch(Plane.XY.offset(SALIENTE_EXTRUIR10_START)):
        with Locations((23.49289371, 28.646345322)):
            Circle(CROQUIS1_14_R)
        with Locations((23.49289371, 28.646345322)):
            Circle(CROQUIS1_14_R_2, mode=Mode.SUBTRACT)
    # profile 3 of 4: a face of its own
    with BuildSketch(Plane.XY.offset(SALIENTE_EXTRUIR10_START)):
        with Locations((22.64289371, 99.146345322)):
            Circle(CROQUIS1_14_R)
        with Locations((22.64289371, 99.146345322)):
            Circle(CROQUIS1_14_R_2, mode=Mode.SUBTRACT)
    # profile 4 of 4: a face of its own
    with BuildSketch(Plane.XY.offset(SALIENTE_EXTRUIR10_START)):
        with Locations((-36.35710629, 99.146345322)):
            Circle(CROQUIS1_14_R)
        with Locations((-36.35710629, 99.146345322)):
            Circle(CROQUIS1_14_R_2, mode=Mode.SUBTRACT)
    extrude(amount=SALIENTE_EXTRUIR10_DEPTH)

    # Croquis3 → Cortar-Extruir2 (cut)
    with BuildSketch(Plane(origin=(0, 0, 0), x_dir=(1, 0, 0), z_dir=(0, 1, 0)).offset(CORTAR_EXTRUIR2_START)):
        with BuildLine():
            ThreePointArc((53.363727024, -9.25), (52.338600759, -6.775126266), (49.863727024, -5.75))
            Line((49.863727024, -5.75), (49.863727024, -9.25))
            Line((49.863727024, -9.25), (53.363727024, -9.25))
        make_face()
        with BuildLine():
            Line((49.863727024, -9.25), (49.863727024, -5.75))
            ThreePointArc((49.863727024, -5.75), (47.38885329, -11.724873734), (53.363727024, -9.25))
            Line((53.363727024, -9.25), (49.863727024, -9.25))
        make_face()
    extrude(amount=-CORTAR_EXTRUIR2_DEPTH, mode=Mode.SUBTRACT)

    # Croquis1<17> → Saliente-Extruir12 (add)
    # profile 1 of 2: a face of its own
    with BuildSketch(Plane.XY):
        with Locations((40.86566447, 131.64077129)):
            Circle(CROQUIS1_17_R)
        with Locations((40.86566447, 131.64077129)):
            Circle(CROQUIS1_17_R_2, mode=Mode.SUBTRACT)
    # profile 2 of 2: a face of its own
    with BuildSketch(Plane.XY):
        with Locations((58.86566447, 131.64077129)):
            Circle(CROQUIS1_17_R)
        with Locations((58.86566447, 131.64077129)):
            Circle(CROQUIS1_17_R_2, mode=Mode.SUBTRACT)
    extrude(amount=SALIENTE_EXTRUIR12_DEPTH)


solid = part.part
